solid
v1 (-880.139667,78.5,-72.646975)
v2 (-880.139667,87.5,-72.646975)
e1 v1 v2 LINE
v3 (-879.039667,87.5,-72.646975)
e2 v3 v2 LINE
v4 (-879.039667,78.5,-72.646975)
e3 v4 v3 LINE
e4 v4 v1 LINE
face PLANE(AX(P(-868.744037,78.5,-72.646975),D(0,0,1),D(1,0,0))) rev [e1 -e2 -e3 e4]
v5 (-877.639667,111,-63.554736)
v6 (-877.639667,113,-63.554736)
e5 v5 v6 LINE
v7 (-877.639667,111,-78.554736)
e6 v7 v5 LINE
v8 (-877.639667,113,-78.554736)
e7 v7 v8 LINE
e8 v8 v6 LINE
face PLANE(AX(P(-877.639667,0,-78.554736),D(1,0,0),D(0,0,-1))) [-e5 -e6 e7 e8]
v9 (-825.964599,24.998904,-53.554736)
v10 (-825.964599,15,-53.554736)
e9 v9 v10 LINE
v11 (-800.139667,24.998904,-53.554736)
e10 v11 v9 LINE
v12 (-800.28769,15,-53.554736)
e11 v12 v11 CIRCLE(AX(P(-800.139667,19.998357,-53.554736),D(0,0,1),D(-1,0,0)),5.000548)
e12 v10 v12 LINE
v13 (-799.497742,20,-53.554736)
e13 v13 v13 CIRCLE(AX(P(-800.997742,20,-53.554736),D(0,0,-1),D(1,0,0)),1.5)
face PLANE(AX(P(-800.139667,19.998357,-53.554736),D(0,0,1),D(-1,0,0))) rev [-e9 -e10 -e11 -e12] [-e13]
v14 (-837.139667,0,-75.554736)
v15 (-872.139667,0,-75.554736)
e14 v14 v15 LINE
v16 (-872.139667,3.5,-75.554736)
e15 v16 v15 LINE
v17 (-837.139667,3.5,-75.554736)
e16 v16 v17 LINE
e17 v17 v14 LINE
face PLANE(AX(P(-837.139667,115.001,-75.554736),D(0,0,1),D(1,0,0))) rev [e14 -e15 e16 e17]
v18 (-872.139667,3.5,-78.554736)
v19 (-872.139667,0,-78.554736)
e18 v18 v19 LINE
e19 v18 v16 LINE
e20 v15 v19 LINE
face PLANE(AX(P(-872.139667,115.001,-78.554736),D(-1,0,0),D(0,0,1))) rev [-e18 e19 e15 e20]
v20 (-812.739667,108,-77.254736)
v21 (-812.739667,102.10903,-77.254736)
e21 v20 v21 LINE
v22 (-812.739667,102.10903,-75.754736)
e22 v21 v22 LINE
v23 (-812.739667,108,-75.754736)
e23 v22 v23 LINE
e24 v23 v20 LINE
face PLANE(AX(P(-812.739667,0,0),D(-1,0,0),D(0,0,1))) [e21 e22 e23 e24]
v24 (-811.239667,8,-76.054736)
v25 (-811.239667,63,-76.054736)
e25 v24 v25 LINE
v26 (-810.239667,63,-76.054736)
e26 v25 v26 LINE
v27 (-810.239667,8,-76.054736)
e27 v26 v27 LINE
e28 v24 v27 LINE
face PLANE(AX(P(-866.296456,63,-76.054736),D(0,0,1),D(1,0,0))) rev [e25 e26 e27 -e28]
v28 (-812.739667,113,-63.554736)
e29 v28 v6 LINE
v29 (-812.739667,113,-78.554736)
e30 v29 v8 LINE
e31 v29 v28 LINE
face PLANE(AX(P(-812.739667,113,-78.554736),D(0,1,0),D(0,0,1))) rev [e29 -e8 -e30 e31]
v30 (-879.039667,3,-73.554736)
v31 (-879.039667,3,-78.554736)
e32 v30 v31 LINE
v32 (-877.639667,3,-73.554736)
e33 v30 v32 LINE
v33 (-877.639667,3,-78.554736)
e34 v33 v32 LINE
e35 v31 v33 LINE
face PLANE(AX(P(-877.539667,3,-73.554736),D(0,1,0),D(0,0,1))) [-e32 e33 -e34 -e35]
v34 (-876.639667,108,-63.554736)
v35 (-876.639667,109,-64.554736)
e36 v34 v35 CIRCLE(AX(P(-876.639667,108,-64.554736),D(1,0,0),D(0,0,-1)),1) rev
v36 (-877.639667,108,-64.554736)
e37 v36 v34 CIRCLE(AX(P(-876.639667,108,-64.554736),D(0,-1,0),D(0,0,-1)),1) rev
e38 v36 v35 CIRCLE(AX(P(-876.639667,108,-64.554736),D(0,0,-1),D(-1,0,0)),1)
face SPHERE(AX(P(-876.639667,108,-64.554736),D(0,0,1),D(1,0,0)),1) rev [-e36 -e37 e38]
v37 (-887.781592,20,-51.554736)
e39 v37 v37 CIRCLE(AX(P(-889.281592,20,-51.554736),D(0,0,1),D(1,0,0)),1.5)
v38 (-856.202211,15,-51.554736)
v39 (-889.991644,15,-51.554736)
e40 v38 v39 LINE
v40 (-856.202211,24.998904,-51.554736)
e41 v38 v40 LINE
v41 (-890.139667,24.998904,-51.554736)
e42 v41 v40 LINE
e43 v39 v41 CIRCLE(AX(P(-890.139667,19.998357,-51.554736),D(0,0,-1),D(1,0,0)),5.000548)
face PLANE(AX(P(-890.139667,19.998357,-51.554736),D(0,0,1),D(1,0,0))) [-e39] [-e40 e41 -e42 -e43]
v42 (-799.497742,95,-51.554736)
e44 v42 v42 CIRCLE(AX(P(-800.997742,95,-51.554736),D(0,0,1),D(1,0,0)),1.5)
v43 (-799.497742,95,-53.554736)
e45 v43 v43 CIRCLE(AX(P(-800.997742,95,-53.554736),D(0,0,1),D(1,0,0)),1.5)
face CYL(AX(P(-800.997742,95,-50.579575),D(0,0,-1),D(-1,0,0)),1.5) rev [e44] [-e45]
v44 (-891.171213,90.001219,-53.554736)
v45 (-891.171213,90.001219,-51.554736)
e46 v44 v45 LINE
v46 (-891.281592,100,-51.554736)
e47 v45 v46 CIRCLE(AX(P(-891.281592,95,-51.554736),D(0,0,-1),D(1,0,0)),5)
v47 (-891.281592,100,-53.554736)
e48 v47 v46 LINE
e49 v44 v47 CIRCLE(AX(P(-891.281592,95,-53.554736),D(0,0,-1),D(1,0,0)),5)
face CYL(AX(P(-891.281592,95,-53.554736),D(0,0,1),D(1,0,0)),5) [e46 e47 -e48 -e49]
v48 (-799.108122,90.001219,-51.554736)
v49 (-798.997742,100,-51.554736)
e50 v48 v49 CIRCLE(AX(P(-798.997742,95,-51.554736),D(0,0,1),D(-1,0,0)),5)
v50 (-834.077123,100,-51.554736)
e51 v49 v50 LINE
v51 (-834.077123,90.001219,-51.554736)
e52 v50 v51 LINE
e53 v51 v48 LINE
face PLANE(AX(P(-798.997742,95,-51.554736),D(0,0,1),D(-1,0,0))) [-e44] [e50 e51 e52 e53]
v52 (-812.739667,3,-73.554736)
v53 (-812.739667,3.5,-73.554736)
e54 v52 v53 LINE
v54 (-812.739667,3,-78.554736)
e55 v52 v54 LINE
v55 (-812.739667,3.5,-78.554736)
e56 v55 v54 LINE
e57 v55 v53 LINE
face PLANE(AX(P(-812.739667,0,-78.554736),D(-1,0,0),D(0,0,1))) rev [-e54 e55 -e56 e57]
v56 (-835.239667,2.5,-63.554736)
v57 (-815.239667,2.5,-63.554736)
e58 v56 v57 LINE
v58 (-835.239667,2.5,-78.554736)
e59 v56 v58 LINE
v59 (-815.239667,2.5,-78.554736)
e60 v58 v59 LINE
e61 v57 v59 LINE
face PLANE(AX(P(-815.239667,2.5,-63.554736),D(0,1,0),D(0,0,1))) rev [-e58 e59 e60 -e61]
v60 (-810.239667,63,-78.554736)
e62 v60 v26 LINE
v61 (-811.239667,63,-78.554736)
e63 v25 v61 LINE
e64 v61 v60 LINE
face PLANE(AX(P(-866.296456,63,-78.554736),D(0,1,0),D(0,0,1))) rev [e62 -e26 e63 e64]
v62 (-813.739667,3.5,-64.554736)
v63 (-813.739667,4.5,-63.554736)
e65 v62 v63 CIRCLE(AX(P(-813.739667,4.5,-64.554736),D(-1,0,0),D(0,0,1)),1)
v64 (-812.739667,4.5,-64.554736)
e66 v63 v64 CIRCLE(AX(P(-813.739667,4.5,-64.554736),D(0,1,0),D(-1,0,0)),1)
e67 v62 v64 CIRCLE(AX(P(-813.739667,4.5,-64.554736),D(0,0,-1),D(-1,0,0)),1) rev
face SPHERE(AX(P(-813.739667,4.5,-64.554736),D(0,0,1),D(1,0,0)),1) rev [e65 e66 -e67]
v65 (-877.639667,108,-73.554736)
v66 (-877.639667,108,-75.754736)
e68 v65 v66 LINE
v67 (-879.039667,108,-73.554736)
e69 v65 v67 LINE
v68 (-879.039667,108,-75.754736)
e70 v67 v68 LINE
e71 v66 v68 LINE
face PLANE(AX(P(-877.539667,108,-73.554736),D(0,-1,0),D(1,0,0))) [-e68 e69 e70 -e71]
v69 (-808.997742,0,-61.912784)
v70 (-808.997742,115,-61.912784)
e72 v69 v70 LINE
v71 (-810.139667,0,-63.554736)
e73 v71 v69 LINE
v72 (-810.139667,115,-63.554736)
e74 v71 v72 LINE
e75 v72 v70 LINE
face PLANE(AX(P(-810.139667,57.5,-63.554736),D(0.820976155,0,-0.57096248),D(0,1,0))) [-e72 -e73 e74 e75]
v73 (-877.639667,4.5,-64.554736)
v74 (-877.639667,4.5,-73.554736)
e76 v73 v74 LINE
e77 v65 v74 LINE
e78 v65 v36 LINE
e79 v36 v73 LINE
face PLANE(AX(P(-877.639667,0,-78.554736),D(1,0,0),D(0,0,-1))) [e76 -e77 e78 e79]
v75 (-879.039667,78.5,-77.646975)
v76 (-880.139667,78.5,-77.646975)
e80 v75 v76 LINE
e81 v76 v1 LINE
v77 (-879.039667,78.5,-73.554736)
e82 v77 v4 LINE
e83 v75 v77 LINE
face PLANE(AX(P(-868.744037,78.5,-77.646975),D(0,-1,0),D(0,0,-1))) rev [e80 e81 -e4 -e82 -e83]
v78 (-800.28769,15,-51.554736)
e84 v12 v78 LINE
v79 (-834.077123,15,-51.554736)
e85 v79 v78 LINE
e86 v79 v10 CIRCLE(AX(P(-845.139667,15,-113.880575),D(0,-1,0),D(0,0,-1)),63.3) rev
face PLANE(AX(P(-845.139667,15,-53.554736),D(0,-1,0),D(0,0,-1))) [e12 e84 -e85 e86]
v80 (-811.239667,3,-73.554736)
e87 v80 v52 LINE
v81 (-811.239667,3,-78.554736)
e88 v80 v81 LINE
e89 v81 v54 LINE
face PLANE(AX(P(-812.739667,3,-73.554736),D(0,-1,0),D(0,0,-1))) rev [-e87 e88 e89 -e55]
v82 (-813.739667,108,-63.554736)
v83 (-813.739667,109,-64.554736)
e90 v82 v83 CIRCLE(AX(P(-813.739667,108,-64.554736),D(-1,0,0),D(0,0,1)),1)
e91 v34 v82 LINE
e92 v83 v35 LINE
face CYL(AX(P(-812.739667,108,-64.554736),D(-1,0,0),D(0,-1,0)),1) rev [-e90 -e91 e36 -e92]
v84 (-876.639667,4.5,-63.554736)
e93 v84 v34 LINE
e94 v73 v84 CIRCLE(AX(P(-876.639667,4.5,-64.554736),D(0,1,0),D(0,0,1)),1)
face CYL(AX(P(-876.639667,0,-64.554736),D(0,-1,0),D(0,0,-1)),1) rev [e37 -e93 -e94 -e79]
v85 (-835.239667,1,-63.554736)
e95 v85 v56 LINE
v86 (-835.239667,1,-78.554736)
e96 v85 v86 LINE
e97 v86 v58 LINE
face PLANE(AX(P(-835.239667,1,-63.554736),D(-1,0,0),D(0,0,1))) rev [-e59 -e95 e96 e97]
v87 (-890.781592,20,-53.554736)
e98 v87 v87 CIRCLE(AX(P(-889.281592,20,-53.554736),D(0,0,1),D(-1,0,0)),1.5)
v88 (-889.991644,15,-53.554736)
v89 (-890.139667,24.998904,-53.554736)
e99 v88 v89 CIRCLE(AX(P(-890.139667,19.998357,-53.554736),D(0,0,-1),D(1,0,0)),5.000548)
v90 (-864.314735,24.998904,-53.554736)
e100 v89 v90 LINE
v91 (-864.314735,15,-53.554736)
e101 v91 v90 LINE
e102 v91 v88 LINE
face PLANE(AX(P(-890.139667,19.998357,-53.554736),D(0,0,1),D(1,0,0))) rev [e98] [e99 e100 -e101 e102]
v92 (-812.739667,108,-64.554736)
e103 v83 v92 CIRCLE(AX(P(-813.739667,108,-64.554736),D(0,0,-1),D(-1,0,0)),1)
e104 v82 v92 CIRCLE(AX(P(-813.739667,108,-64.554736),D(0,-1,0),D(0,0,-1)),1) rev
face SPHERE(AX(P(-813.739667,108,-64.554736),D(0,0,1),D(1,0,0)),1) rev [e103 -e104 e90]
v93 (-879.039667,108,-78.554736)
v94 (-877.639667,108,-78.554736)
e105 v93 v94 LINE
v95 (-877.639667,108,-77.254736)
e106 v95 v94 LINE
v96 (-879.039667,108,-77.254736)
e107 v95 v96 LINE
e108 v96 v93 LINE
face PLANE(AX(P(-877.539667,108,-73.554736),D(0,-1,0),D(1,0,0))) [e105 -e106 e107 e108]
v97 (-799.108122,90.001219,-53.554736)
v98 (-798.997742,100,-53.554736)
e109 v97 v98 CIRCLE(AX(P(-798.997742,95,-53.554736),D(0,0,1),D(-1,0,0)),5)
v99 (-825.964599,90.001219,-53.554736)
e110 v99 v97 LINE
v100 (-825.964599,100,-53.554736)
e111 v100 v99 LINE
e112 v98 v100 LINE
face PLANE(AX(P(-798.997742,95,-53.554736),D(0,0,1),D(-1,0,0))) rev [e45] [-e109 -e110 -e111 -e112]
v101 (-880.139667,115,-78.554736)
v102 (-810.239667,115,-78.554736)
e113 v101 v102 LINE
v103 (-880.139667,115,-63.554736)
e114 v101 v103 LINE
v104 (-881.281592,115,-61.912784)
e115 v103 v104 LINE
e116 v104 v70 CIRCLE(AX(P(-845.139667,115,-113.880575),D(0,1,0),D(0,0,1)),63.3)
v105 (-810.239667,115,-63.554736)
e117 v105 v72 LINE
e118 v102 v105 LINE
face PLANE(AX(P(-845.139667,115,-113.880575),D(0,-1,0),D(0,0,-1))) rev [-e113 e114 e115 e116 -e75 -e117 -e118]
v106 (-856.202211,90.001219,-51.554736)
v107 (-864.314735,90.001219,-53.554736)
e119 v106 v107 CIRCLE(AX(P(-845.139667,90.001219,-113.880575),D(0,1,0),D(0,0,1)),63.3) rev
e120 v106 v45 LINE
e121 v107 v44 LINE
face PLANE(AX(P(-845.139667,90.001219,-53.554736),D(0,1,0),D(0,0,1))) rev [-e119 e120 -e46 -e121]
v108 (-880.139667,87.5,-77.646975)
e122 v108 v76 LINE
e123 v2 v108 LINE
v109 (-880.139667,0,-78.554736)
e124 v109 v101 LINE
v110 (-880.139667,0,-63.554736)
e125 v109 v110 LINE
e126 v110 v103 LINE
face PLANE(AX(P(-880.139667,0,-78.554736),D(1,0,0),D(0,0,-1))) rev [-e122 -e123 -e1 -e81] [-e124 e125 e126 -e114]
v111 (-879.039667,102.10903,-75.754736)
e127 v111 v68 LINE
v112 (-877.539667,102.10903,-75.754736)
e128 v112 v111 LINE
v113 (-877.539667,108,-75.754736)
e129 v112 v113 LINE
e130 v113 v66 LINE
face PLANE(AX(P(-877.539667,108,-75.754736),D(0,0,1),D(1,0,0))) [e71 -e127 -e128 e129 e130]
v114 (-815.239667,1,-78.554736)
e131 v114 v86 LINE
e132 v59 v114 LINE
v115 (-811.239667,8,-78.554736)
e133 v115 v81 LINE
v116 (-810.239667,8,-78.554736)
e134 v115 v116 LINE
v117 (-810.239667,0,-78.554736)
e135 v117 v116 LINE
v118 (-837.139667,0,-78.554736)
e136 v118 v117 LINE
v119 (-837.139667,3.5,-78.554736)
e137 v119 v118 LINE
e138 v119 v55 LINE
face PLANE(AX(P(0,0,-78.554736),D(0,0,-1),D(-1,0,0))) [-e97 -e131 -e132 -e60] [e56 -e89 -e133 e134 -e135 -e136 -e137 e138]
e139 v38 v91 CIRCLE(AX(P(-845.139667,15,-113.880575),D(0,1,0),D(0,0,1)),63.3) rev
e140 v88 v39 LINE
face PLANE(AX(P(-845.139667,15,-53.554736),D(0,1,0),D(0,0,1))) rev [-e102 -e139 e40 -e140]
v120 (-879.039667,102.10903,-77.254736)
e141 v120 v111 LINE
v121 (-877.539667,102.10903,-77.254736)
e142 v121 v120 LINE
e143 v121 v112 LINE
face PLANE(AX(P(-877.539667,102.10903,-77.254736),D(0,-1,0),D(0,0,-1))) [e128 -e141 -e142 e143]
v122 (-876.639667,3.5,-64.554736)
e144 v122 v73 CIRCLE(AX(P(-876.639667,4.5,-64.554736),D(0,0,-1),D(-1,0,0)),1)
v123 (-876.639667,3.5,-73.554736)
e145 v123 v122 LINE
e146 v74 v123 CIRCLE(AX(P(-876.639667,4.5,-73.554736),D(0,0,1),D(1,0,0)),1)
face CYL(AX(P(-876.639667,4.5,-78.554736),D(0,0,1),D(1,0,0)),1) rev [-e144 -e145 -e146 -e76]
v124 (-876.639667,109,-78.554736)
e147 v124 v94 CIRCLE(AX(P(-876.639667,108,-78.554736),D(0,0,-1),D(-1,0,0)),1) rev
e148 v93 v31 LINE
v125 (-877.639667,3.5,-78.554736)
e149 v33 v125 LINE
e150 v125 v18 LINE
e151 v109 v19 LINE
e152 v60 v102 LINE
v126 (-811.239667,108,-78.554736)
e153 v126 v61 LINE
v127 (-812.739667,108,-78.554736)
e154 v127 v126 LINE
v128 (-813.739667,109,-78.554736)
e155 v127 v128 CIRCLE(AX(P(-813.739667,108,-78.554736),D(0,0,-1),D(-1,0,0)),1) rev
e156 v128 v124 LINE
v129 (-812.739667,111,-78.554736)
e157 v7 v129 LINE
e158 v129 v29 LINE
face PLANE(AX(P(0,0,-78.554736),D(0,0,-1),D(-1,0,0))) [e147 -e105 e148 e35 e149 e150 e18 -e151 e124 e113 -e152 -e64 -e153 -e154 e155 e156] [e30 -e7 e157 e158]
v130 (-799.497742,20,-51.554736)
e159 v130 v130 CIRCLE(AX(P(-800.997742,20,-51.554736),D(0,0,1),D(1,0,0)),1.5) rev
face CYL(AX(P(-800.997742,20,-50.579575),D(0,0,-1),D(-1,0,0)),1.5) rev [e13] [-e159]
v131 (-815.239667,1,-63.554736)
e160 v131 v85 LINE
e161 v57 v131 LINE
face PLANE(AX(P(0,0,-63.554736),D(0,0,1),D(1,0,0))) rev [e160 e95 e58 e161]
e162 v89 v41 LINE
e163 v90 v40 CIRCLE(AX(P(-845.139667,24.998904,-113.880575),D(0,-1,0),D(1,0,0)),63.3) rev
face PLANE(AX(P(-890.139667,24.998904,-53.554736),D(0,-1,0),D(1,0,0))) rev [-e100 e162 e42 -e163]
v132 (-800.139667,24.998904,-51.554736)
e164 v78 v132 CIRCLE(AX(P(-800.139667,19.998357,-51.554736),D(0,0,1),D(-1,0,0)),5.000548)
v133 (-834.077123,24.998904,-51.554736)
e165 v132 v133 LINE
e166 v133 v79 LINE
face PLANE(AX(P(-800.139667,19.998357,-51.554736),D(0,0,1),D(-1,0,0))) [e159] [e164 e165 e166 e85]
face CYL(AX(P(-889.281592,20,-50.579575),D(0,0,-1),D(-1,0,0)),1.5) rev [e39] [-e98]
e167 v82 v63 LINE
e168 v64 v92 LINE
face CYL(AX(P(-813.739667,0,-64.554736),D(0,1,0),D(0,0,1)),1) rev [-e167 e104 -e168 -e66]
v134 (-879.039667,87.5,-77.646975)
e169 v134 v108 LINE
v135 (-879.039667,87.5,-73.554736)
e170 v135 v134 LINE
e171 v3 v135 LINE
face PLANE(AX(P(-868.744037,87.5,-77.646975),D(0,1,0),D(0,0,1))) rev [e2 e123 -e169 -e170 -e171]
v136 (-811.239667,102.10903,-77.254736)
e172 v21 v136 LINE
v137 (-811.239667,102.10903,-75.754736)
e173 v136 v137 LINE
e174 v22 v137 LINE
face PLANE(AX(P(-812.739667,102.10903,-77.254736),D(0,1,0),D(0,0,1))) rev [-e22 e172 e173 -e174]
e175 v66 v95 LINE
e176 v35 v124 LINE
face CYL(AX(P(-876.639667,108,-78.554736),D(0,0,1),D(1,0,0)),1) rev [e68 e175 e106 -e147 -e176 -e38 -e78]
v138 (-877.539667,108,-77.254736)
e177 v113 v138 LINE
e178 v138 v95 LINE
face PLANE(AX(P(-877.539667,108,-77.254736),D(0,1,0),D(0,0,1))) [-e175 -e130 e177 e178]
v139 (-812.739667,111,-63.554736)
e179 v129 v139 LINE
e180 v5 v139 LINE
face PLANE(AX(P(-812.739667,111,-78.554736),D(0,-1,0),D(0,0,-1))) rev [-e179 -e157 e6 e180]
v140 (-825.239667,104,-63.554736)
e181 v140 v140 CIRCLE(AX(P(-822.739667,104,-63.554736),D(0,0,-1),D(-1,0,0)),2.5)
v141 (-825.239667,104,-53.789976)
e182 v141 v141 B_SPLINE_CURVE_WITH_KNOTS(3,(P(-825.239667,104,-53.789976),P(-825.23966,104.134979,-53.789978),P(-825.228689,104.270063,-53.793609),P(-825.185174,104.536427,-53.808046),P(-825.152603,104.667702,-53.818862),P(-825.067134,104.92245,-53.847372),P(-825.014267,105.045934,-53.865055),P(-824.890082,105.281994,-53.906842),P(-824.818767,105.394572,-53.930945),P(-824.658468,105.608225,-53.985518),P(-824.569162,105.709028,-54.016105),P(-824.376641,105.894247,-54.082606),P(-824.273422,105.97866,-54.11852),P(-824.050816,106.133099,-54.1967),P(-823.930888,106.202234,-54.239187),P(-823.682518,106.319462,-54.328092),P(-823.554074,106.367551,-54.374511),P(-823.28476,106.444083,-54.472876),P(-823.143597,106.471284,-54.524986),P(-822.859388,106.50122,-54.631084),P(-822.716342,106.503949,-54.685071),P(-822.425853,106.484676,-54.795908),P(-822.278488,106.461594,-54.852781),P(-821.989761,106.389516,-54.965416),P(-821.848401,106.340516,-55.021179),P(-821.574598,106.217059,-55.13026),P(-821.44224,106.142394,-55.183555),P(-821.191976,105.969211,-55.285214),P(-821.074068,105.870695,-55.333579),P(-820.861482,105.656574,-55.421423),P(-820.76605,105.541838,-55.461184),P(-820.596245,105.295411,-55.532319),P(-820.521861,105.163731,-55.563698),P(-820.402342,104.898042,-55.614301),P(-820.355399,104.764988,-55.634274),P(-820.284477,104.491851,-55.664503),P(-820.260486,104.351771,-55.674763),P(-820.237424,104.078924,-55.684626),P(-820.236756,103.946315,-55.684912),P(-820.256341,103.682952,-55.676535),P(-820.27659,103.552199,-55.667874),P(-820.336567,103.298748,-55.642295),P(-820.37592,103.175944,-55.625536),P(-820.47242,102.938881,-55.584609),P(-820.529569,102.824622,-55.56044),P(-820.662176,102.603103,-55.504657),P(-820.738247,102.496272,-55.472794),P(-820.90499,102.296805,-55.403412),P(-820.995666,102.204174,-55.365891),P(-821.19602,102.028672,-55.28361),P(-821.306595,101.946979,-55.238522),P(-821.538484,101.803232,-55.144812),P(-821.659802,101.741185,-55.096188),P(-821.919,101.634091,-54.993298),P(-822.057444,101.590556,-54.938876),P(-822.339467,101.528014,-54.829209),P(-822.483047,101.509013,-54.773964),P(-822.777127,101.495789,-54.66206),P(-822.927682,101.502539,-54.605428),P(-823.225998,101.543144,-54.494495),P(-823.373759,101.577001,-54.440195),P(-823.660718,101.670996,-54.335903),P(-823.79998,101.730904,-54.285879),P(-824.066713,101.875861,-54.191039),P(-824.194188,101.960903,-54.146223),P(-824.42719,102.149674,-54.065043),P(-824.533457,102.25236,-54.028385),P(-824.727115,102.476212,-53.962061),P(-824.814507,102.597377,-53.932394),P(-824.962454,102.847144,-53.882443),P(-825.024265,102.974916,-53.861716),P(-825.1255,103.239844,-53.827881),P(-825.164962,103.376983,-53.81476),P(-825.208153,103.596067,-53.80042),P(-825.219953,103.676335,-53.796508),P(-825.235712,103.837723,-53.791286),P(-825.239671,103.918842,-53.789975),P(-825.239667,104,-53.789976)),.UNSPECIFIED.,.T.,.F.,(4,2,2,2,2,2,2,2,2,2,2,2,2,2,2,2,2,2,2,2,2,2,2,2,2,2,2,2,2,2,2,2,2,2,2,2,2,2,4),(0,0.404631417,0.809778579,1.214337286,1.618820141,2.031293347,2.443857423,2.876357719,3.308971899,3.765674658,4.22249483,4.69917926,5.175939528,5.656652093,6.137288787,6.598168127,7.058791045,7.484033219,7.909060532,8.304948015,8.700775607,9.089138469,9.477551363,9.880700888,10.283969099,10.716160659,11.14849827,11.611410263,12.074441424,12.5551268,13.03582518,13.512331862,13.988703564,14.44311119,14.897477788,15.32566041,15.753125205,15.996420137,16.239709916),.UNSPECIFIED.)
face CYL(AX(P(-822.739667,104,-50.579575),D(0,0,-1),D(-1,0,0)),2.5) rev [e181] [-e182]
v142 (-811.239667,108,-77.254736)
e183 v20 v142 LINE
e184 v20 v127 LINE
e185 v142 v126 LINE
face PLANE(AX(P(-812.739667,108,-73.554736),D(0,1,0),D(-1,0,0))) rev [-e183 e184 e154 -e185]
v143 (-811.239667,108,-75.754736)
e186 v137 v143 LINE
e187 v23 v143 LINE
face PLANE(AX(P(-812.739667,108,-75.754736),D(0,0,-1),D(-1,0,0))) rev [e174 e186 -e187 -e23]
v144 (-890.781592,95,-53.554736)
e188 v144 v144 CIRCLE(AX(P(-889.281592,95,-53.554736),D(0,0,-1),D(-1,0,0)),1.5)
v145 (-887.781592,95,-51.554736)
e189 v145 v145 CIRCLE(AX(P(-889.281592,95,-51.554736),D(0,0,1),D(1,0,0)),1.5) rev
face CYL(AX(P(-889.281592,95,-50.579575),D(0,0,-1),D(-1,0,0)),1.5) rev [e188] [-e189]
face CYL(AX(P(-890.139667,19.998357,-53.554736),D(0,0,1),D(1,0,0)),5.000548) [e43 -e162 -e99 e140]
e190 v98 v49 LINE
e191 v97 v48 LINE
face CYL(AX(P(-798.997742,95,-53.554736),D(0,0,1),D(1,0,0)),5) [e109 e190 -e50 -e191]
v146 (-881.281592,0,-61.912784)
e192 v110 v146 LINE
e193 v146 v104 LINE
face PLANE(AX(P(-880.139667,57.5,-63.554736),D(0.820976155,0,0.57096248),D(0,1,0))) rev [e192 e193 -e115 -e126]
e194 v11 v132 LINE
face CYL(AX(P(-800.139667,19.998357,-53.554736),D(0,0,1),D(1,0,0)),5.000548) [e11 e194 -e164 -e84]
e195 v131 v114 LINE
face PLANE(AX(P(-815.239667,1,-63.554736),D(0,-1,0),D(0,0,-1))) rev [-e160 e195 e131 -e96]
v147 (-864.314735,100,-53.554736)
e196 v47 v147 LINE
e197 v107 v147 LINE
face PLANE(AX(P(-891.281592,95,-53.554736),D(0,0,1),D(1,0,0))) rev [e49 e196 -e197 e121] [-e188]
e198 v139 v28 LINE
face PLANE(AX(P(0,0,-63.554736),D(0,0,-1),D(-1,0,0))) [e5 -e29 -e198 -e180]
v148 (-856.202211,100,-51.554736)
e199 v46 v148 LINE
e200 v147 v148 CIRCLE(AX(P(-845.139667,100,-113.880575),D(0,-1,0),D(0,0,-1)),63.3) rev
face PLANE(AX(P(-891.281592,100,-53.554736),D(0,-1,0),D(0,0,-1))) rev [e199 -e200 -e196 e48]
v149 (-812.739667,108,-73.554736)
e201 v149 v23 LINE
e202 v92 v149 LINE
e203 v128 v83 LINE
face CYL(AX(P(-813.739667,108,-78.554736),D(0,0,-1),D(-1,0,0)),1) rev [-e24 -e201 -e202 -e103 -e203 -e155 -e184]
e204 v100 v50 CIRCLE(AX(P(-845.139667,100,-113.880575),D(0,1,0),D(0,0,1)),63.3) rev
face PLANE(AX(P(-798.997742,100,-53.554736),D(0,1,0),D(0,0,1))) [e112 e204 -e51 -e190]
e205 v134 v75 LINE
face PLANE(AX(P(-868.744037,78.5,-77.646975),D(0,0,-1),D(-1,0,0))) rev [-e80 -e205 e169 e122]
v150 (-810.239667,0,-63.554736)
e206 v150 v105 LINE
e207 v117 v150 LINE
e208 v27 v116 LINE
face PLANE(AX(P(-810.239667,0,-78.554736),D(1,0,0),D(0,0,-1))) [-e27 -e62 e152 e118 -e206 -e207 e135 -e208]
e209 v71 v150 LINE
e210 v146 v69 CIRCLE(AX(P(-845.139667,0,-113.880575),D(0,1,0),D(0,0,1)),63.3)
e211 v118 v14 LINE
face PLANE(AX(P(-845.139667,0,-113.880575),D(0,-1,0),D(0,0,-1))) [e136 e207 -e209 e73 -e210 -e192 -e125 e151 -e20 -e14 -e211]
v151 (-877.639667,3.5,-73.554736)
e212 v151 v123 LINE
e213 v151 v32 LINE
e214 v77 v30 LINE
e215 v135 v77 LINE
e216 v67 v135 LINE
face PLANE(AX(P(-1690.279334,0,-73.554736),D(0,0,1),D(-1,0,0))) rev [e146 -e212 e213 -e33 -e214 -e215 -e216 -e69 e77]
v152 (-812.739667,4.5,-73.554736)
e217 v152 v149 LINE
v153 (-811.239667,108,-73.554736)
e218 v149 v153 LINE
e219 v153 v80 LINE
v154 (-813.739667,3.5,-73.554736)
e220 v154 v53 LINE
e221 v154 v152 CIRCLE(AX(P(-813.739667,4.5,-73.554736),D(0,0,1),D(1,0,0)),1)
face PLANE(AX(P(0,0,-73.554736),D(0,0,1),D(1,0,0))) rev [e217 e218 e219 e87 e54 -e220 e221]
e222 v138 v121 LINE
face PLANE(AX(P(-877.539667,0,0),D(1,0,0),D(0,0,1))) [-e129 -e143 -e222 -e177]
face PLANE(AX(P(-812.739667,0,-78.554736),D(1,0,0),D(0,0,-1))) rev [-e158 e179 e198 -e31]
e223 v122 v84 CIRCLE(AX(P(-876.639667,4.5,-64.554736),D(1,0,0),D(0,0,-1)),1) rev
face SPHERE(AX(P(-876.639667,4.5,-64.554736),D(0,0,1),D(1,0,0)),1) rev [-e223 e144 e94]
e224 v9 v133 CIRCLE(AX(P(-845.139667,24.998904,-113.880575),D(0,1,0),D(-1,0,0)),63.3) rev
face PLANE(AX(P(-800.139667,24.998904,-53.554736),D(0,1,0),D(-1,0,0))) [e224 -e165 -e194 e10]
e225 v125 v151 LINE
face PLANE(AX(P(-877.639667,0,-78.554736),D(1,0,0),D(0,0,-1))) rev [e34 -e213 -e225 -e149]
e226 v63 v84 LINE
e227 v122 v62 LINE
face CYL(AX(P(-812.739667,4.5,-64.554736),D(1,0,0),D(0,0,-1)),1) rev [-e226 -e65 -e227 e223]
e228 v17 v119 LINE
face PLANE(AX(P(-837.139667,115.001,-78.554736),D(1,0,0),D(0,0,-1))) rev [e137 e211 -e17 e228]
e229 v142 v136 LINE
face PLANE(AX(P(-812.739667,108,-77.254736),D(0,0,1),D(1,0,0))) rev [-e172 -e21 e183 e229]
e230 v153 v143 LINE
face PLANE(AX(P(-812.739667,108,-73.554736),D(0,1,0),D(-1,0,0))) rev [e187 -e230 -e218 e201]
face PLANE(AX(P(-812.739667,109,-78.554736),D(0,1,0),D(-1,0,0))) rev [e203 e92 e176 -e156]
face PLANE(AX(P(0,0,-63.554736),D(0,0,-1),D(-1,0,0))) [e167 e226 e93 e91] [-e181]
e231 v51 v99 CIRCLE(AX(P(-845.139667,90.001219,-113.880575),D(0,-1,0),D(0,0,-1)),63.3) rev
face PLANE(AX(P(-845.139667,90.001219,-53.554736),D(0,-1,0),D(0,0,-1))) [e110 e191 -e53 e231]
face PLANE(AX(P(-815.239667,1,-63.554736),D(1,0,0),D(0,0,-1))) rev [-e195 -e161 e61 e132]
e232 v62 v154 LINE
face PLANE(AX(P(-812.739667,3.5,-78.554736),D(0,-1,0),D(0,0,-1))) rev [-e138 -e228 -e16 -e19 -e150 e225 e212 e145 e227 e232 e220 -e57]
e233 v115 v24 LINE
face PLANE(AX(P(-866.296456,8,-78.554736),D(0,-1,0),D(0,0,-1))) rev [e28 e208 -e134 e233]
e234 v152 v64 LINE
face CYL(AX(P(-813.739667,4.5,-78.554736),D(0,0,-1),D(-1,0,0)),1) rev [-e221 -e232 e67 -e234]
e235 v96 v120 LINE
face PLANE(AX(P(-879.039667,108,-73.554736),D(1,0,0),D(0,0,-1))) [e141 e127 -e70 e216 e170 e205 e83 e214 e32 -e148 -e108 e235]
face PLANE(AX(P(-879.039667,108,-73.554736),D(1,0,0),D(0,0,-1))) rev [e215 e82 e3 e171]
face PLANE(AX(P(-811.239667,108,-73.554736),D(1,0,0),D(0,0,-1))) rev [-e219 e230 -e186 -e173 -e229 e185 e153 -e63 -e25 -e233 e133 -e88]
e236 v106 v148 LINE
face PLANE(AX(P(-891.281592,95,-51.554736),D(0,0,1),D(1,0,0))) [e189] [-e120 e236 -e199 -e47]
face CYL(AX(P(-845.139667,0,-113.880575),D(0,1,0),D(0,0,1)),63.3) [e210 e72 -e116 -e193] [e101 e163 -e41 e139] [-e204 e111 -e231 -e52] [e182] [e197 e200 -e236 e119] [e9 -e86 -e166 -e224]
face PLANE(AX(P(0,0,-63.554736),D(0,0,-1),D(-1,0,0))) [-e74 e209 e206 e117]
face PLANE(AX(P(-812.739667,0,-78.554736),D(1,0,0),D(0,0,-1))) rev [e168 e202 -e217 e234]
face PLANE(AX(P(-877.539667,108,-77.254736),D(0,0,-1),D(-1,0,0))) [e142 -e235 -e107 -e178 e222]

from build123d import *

# Parameters (mm, degrees)
SURFACE_EXTRUDE2_1_DEPTH = 115
THICKEN3_T2              = 2
BOSS_EXTRUDE2_REACH      = 890.848
SKETCH11_W               = 70
SKETCH11_H               = 115
BOSS_EXTRUDE7_DEPTH      = 2
SKETCH17_W               = 2.5
SKETCH17_H               = 115
BOSS_EXTRUDE8_DEPTH      = 15
SKETCH22_W               = 1.5
SKETCH22_H               = 105
CUT_EXTRUDE1_DEPTH       = 5
SKETCH23_W               = 64.9
SKETCH23_H               = 2
BOSS_EXTRUDE9_DEPTH      = 15
SKETCH25_W               = 64.9
SKETCH25_H               = 3.5
BOSS_EXTRUDE10_DEPTH     = 15
SKETCH26_W               = 20
SKETCH26_H               = 1.5
CUT_EXTRUDE3_DEPTH       = 15
SKETCH27_W               = 5
SKETCH27_H               = 9
CUT_EXTRUDE4_DEPTH       = 1.1
SKETCH29_W               = 2.5
SKETCH29_H               = 55
CUT_EXTRUDE6_DEPTH       = 1
CUT_EXTRUDE7_REACH       = 905.754
CUT_EXTRUDE7_END_RADIUS  = 63.3
SKETCH30_R               = 2.5
FILLET1_R                = 1
CUT_EXTRUDE8_REACH       = 909.037
SKETCH31_W               = 35
SKETCH31_H               = 3
CUT_EXTRUDE9_REACH       = 905.975
SKETCH32_R               = 1.5
SKETCH33_W               = 1.5
SKETCH33_H               = 5.890969975
BOSS_EXTRUDE11_DEPTH     = 1.5
MIRROR24_COPY_1_REACH    = 905.975
MIRROR24_COPY_1_SKETCH_R = 1.5


with BuildPart() as body_1:
    # Surface-Extrude2: a surface, the sketch's curves swept straight by 115 mm
    with BuildLine(Plane(origin=(0, 0, 0), x_dir=(1, 0, 0), z_dir=(0, 1, 0)), mode=Mode.PRIVATE) as surface_extrude2_1_path:
        ThreePointArc((-880.139667207, 63.554736355), (-845.139667207, 52.580574649), (-810.139667207, 63.554736355))
    surface_extrude2_1 = Shell.extrude(surface_extrude2_1_path.wire(), (0 * SURFACE_EXTRUDE2_1_DEPTH, 1 * SURFACE_EXTRUDE2_1_DEPTH, 0 * SURFACE_EXTRUDE2_1_DEPTH))
    add(Solid.thicken(surface_extrude2_1, -THICKEN3_T2))

    # Sketch11 → Boss-Extrude2 (add, up to next)
    with BuildSketch(Plane(origin=(0, 0, -63.554736355), x_dir=(-1, 0, 0), z_dir=(0, 0, -1)), mode=Mode.PRIVATE) as boss_extrude2_sk1:
        with Locations((845.139667207, 57.5)):
            Rectangle(SKETCH11_W, SKETCH11_H)
    boss_extrude2_tool1 = extrude(boss_extrude2_sk1.sketch, amount=-BOSS_EXTRUDE2_REACH, mode=Mode.PRIVATE) - body_1.part
    add(boss_extrude2_tool1.solids().sort_by_distance((-845.139667, 57.5, -63.554736))[0])

    # Sketch15 → Boss-Extrude7 (add)
    with BuildSketch(Plane(origin=(0, 0, -51.554736355), x_dir=(-1, 0, 0), z_dir=(0, 0, -1))):
        with BuildLine():
            Line((890.139667207, 24.998904399), (845.139667207, 24.998904399))
            Line((845.139667207, 24.998904399), (845.139667207, 15))
            Line((845.139667207, 15), (889.991644173, 15))
            ThreePointArc((889.991644173, 15), (895.139667207, 19.924336912), (890.139667207, 24.998904399))
        make_face()
        with BuildLine():
            Line((891.281592166, 100), (845.139667207, 100))
            Line((845.139667207, 100), (845.139667207, 90.00121851))
            Line((845.139667207, 90.00121851), (891.171212738, 90.00121851))
            ThreePointArc((891.171212738, 90.00121851), (896.281287529, 94.944806923), (891.281592166, 100))
        make_face()
    boss_extrude7 = extrude(amount=BOSS_EXTRUDE7_DEPTH)

    # Mirror20: Boss-Extrude7 across plane
    add(boss_extrude7.mirror(Plane.ZY.offset(845.139667207)))

    # Sketch17 → Boss-Extrude8 (add)
    with BuildSketch(Plane(origin=(0, 0, -63.554736355), x_dir=(-1, 0, 0), z_dir=(0, 0, -1))):
        with Locations((878.889667207, 57.5)):
            Rectangle(SKETCH17_W, SKETCH17_H)
        with Locations((811.489667207, 57.5)):
            Rectangle(SKETCH17_W, SKETCH17_H)
    extrude(amount=BOSS_EXTRUDE8_DEPTH)

    # Sketch22 → Cut-Extrude1 (cut)
    with BuildSketch(Plane(origin=(0, 0, -78.554736355), x_dir=(-1, 0, 0), z_dir=(0, 0, -1))):
        with Locations((811.989667207, 55.5)):
            Rectangle(SKETCH22_W, SKETCH22_H)
    cut_extrude1 = extrude(amount=-CUT_EXTRUDE1_DEPTH, mode=Mode.SUBTRACT)

    # Mirror21: Cut-Extrude1 across plane
    add(cut_extrude1.mirror(Plane.ZY.offset(845.139667207)), mode=Mode.SUBTRACT)

    # Sketch23 → Boss-Extrude9 (add)
    with BuildSketch(Plane(origin=(0, 0, -63.554736355), x_dir=(-1, 0, 0), z_dir=(0, 0, -1))):
        with Locations((845.189667207, 114)):
            Rectangle(SKETCH23_W, SKETCH23_H)
        with Locations((845.189667207, 110)):
            Rectangle(SKETCH23_W, SKETCH23_H)
    extrude(amount=BOSS_EXTRUDE9_DEPTH)

    # Sketch25 → Boss-Extrude10 (add)
    with BuildSketch(Plane(origin=(0, 0, -63.554736355), x_dir=(-1, 0, 0), z_dir=(0, 0, -1))):
        with Locations((845.189667207, 1.75)):
            Rectangle(SKETCH25_W, SKETCH25_H)
    extrude(amount=BOSS_EXTRUDE10_DEPTH)

    # Sketch26 → Cut-Extrude3 (cut)
    with BuildSketch(Plane(origin=(0, 0, -78.554736355), x_dir=(-1, 0, 0), z_dir=(0, 0, -1))):
        with Locations((825.239667207, 1.75)):
            Rectangle(SKETCH26_W, SKETCH26_H)
    extrude(amount=-CUT_EXTRUDE3_DEPTH, mode=Mode.SUBTRACT)

    # Sketch27 → Cut-Extrude4 (cut)
    with BuildSketch(Plane.ZY.offset(880.139667207)):
        with Locations((-75.146974965, 83)):
            Rectangle(SKETCH27_W, SKETCH27_H)
    extrude(amount=-CUT_EXTRUDE4_DEPTH, mode=Mode.SUBTRACT)

    # Sketch29 → Cut-Extrude6 (cut)
    with BuildSketch(Plane(origin=(-810.239667207, 0, 0), x_dir=(0, 0, -1), z_dir=(1, 0, 0))):
        with Locations((77.304736355, 35.5)):
            Rectangle(SKETCH29_W, SKETCH29_H)
    extrude(amount=-CUT_EXTRUDE6_DEPTH, mode=Mode.SUBTRACT)

    # Cut-Extrude7: up to this cylinder (the profile starts inside it)
    cut_extrude7_end = Plane(origin=(-845.139667207, 104, -113.880574649), z_dir=(0, 1, 0)) * Cylinder(CUT_EXTRUDE7_END_RADIUS, 1939.108, mode=Mode.PRIVATE)
    # Sketch30 → Cut-Extrude7 (cut, up to the surface)
    with BuildSketch(Plane(origin=(0, 0, -63.554736355), x_dir=(-1, 0, 0), z_dir=(0, 0, -1)), mode=Mode.PRIVATE) as cut_extrude7_sk1:
        with Locations((822.739667207, 104)):
            Circle(SKETCH30_R)
    cut_extrude7_tool1 = extrude(cut_extrude7_sk1.sketch, amount=-CUT_EXTRUDE7_REACH, mode=Mode.PRIVATE) & cut_extrude7_end
    add(cut_extrude7_tool1.solids().sort_by_distance((-822.739667, 104, -63.554736))[0], mode=Mode.SUBTRACT)

    # Fillet1
    fillet1_edges = [body_1.edges().sort_by_distance(p)[0] for p in [
        (-812.739667207, 3.5, -68.554736355),
        (-812.739667207, 109, -71.054736355),
        (-877.639667207, 109, -71.054736355),
        (-877.639667207, 3.5, -68.554736355),
        (-845.189667207, 3.5, -63.554736355),
        (-812.739667207, 56.25, -63.554736355),
        (-845.189667207, 109, -63.554736355),
        (-877.639667207, 56.25, -63.554736355),
    ]]
    fillet(fillet1_edges, radius=FILLET1_R - 0.0001)  # a hair under: the kernel refuses the full size

    # Sketch31 → Cut-Extrude8 (cut, up to next)
    with BuildSketch(Plane.XZ, mode=Mode.PRIVATE) as cut_extrude8_sk1:
        with Locations((-854.639667207, -77.054736355)):
            Rectangle(SKETCH31_W, SKETCH31_H)
    cut_extrude8_tool1 = extrude(cut_extrude8_sk1.sketch, amount=-CUT_EXTRUDE8_REACH, mode=Mode.PRIVATE) & body_1.part
    add(cut_extrude8_tool1.solids().sort_by_distance((-854.639667, 0, -77.054736))[0], mode=Mode.SUBTRACT)

    # Sketch32 → Cut-Extrude9 (cut, up to next)
    with BuildSketch(Plane(origin=(0, 0, -53.554736355), x_dir=(-1, 0, 0), z_dir=(0, 0, -1)), mode=Mode.PRIVATE) as cut_extrude9_sk1:
        with Locations((889.281592166, 95)):
            Circle(SKETCH32_R)
    cut_extrude9_tool1 = extrude(cut_extrude9_sk1.sketch, amount=-CUT_EXTRUDE9_REACH, mode=Mode.PRIVATE) & body_1.part
    cut_extrude9 = cut_extrude9_tool1.solids().sort_by_distance((-889.281592, 95, -53.554736))[0]
    add(cut_extrude9, mode=Mode.SUBTRACT)

    # Sketch33 → Boss-Extrude11 (add)
    with BuildSketch(Plane.ZY.offset(811.239667207)):
        with Locations((-76.504736355, 105.054515013)):
            Rectangle(SKETCH33_W, SKETCH33_H)
    boss_extrude11 = extrude(amount=BOSS_EXTRUDE11_DEPTH)

    # Mirror22: Boss-Extrude11 across plane
    add(boss_extrude11.mirror(Plane.ZY.offset(845.139667207)))

    # Mirror23: Cut-Extrude9 across plane
    add(cut_extrude9.mirror(Plane.ZY.offset(845.139667207)), mode=Mode.SUBTRACT)

    # Mirror24: Cut-Extrude9 across plane
    add(cut_extrude9.mirror(Plane.ZX.offset(57.5)), mode=Mode.SUBTRACT)

    # Mirror24 copy 1 sketch → Mirror24 copy 1 (cut, up to next)
    with BuildSketch(Plane(origin=(-1690.279334414, 115, -53.554736355), x_dir=(1, 0, 0), z_dir=(0, 0, -1)), mode=Mode.PRIVATE) as mirror24_copy_1_sk1:
        with Locations((889.281592166, 95)):
            Circle(MIRROR24_COPY_1_SKETCH_R)
    mirror24_copy_1_tool1 = extrude(mirror24_copy_1_sk1.sketch, amount=-MIRROR24_COPY_1_REACH, mode=Mode.PRIVATE) & body_1.part
    add(mirror24_copy_1_tool1.solids().sort_by_distance((-800.997742414, 20, -53.554736))[0], mode=Mode.SUBTRACT)


solid = body_1.part
